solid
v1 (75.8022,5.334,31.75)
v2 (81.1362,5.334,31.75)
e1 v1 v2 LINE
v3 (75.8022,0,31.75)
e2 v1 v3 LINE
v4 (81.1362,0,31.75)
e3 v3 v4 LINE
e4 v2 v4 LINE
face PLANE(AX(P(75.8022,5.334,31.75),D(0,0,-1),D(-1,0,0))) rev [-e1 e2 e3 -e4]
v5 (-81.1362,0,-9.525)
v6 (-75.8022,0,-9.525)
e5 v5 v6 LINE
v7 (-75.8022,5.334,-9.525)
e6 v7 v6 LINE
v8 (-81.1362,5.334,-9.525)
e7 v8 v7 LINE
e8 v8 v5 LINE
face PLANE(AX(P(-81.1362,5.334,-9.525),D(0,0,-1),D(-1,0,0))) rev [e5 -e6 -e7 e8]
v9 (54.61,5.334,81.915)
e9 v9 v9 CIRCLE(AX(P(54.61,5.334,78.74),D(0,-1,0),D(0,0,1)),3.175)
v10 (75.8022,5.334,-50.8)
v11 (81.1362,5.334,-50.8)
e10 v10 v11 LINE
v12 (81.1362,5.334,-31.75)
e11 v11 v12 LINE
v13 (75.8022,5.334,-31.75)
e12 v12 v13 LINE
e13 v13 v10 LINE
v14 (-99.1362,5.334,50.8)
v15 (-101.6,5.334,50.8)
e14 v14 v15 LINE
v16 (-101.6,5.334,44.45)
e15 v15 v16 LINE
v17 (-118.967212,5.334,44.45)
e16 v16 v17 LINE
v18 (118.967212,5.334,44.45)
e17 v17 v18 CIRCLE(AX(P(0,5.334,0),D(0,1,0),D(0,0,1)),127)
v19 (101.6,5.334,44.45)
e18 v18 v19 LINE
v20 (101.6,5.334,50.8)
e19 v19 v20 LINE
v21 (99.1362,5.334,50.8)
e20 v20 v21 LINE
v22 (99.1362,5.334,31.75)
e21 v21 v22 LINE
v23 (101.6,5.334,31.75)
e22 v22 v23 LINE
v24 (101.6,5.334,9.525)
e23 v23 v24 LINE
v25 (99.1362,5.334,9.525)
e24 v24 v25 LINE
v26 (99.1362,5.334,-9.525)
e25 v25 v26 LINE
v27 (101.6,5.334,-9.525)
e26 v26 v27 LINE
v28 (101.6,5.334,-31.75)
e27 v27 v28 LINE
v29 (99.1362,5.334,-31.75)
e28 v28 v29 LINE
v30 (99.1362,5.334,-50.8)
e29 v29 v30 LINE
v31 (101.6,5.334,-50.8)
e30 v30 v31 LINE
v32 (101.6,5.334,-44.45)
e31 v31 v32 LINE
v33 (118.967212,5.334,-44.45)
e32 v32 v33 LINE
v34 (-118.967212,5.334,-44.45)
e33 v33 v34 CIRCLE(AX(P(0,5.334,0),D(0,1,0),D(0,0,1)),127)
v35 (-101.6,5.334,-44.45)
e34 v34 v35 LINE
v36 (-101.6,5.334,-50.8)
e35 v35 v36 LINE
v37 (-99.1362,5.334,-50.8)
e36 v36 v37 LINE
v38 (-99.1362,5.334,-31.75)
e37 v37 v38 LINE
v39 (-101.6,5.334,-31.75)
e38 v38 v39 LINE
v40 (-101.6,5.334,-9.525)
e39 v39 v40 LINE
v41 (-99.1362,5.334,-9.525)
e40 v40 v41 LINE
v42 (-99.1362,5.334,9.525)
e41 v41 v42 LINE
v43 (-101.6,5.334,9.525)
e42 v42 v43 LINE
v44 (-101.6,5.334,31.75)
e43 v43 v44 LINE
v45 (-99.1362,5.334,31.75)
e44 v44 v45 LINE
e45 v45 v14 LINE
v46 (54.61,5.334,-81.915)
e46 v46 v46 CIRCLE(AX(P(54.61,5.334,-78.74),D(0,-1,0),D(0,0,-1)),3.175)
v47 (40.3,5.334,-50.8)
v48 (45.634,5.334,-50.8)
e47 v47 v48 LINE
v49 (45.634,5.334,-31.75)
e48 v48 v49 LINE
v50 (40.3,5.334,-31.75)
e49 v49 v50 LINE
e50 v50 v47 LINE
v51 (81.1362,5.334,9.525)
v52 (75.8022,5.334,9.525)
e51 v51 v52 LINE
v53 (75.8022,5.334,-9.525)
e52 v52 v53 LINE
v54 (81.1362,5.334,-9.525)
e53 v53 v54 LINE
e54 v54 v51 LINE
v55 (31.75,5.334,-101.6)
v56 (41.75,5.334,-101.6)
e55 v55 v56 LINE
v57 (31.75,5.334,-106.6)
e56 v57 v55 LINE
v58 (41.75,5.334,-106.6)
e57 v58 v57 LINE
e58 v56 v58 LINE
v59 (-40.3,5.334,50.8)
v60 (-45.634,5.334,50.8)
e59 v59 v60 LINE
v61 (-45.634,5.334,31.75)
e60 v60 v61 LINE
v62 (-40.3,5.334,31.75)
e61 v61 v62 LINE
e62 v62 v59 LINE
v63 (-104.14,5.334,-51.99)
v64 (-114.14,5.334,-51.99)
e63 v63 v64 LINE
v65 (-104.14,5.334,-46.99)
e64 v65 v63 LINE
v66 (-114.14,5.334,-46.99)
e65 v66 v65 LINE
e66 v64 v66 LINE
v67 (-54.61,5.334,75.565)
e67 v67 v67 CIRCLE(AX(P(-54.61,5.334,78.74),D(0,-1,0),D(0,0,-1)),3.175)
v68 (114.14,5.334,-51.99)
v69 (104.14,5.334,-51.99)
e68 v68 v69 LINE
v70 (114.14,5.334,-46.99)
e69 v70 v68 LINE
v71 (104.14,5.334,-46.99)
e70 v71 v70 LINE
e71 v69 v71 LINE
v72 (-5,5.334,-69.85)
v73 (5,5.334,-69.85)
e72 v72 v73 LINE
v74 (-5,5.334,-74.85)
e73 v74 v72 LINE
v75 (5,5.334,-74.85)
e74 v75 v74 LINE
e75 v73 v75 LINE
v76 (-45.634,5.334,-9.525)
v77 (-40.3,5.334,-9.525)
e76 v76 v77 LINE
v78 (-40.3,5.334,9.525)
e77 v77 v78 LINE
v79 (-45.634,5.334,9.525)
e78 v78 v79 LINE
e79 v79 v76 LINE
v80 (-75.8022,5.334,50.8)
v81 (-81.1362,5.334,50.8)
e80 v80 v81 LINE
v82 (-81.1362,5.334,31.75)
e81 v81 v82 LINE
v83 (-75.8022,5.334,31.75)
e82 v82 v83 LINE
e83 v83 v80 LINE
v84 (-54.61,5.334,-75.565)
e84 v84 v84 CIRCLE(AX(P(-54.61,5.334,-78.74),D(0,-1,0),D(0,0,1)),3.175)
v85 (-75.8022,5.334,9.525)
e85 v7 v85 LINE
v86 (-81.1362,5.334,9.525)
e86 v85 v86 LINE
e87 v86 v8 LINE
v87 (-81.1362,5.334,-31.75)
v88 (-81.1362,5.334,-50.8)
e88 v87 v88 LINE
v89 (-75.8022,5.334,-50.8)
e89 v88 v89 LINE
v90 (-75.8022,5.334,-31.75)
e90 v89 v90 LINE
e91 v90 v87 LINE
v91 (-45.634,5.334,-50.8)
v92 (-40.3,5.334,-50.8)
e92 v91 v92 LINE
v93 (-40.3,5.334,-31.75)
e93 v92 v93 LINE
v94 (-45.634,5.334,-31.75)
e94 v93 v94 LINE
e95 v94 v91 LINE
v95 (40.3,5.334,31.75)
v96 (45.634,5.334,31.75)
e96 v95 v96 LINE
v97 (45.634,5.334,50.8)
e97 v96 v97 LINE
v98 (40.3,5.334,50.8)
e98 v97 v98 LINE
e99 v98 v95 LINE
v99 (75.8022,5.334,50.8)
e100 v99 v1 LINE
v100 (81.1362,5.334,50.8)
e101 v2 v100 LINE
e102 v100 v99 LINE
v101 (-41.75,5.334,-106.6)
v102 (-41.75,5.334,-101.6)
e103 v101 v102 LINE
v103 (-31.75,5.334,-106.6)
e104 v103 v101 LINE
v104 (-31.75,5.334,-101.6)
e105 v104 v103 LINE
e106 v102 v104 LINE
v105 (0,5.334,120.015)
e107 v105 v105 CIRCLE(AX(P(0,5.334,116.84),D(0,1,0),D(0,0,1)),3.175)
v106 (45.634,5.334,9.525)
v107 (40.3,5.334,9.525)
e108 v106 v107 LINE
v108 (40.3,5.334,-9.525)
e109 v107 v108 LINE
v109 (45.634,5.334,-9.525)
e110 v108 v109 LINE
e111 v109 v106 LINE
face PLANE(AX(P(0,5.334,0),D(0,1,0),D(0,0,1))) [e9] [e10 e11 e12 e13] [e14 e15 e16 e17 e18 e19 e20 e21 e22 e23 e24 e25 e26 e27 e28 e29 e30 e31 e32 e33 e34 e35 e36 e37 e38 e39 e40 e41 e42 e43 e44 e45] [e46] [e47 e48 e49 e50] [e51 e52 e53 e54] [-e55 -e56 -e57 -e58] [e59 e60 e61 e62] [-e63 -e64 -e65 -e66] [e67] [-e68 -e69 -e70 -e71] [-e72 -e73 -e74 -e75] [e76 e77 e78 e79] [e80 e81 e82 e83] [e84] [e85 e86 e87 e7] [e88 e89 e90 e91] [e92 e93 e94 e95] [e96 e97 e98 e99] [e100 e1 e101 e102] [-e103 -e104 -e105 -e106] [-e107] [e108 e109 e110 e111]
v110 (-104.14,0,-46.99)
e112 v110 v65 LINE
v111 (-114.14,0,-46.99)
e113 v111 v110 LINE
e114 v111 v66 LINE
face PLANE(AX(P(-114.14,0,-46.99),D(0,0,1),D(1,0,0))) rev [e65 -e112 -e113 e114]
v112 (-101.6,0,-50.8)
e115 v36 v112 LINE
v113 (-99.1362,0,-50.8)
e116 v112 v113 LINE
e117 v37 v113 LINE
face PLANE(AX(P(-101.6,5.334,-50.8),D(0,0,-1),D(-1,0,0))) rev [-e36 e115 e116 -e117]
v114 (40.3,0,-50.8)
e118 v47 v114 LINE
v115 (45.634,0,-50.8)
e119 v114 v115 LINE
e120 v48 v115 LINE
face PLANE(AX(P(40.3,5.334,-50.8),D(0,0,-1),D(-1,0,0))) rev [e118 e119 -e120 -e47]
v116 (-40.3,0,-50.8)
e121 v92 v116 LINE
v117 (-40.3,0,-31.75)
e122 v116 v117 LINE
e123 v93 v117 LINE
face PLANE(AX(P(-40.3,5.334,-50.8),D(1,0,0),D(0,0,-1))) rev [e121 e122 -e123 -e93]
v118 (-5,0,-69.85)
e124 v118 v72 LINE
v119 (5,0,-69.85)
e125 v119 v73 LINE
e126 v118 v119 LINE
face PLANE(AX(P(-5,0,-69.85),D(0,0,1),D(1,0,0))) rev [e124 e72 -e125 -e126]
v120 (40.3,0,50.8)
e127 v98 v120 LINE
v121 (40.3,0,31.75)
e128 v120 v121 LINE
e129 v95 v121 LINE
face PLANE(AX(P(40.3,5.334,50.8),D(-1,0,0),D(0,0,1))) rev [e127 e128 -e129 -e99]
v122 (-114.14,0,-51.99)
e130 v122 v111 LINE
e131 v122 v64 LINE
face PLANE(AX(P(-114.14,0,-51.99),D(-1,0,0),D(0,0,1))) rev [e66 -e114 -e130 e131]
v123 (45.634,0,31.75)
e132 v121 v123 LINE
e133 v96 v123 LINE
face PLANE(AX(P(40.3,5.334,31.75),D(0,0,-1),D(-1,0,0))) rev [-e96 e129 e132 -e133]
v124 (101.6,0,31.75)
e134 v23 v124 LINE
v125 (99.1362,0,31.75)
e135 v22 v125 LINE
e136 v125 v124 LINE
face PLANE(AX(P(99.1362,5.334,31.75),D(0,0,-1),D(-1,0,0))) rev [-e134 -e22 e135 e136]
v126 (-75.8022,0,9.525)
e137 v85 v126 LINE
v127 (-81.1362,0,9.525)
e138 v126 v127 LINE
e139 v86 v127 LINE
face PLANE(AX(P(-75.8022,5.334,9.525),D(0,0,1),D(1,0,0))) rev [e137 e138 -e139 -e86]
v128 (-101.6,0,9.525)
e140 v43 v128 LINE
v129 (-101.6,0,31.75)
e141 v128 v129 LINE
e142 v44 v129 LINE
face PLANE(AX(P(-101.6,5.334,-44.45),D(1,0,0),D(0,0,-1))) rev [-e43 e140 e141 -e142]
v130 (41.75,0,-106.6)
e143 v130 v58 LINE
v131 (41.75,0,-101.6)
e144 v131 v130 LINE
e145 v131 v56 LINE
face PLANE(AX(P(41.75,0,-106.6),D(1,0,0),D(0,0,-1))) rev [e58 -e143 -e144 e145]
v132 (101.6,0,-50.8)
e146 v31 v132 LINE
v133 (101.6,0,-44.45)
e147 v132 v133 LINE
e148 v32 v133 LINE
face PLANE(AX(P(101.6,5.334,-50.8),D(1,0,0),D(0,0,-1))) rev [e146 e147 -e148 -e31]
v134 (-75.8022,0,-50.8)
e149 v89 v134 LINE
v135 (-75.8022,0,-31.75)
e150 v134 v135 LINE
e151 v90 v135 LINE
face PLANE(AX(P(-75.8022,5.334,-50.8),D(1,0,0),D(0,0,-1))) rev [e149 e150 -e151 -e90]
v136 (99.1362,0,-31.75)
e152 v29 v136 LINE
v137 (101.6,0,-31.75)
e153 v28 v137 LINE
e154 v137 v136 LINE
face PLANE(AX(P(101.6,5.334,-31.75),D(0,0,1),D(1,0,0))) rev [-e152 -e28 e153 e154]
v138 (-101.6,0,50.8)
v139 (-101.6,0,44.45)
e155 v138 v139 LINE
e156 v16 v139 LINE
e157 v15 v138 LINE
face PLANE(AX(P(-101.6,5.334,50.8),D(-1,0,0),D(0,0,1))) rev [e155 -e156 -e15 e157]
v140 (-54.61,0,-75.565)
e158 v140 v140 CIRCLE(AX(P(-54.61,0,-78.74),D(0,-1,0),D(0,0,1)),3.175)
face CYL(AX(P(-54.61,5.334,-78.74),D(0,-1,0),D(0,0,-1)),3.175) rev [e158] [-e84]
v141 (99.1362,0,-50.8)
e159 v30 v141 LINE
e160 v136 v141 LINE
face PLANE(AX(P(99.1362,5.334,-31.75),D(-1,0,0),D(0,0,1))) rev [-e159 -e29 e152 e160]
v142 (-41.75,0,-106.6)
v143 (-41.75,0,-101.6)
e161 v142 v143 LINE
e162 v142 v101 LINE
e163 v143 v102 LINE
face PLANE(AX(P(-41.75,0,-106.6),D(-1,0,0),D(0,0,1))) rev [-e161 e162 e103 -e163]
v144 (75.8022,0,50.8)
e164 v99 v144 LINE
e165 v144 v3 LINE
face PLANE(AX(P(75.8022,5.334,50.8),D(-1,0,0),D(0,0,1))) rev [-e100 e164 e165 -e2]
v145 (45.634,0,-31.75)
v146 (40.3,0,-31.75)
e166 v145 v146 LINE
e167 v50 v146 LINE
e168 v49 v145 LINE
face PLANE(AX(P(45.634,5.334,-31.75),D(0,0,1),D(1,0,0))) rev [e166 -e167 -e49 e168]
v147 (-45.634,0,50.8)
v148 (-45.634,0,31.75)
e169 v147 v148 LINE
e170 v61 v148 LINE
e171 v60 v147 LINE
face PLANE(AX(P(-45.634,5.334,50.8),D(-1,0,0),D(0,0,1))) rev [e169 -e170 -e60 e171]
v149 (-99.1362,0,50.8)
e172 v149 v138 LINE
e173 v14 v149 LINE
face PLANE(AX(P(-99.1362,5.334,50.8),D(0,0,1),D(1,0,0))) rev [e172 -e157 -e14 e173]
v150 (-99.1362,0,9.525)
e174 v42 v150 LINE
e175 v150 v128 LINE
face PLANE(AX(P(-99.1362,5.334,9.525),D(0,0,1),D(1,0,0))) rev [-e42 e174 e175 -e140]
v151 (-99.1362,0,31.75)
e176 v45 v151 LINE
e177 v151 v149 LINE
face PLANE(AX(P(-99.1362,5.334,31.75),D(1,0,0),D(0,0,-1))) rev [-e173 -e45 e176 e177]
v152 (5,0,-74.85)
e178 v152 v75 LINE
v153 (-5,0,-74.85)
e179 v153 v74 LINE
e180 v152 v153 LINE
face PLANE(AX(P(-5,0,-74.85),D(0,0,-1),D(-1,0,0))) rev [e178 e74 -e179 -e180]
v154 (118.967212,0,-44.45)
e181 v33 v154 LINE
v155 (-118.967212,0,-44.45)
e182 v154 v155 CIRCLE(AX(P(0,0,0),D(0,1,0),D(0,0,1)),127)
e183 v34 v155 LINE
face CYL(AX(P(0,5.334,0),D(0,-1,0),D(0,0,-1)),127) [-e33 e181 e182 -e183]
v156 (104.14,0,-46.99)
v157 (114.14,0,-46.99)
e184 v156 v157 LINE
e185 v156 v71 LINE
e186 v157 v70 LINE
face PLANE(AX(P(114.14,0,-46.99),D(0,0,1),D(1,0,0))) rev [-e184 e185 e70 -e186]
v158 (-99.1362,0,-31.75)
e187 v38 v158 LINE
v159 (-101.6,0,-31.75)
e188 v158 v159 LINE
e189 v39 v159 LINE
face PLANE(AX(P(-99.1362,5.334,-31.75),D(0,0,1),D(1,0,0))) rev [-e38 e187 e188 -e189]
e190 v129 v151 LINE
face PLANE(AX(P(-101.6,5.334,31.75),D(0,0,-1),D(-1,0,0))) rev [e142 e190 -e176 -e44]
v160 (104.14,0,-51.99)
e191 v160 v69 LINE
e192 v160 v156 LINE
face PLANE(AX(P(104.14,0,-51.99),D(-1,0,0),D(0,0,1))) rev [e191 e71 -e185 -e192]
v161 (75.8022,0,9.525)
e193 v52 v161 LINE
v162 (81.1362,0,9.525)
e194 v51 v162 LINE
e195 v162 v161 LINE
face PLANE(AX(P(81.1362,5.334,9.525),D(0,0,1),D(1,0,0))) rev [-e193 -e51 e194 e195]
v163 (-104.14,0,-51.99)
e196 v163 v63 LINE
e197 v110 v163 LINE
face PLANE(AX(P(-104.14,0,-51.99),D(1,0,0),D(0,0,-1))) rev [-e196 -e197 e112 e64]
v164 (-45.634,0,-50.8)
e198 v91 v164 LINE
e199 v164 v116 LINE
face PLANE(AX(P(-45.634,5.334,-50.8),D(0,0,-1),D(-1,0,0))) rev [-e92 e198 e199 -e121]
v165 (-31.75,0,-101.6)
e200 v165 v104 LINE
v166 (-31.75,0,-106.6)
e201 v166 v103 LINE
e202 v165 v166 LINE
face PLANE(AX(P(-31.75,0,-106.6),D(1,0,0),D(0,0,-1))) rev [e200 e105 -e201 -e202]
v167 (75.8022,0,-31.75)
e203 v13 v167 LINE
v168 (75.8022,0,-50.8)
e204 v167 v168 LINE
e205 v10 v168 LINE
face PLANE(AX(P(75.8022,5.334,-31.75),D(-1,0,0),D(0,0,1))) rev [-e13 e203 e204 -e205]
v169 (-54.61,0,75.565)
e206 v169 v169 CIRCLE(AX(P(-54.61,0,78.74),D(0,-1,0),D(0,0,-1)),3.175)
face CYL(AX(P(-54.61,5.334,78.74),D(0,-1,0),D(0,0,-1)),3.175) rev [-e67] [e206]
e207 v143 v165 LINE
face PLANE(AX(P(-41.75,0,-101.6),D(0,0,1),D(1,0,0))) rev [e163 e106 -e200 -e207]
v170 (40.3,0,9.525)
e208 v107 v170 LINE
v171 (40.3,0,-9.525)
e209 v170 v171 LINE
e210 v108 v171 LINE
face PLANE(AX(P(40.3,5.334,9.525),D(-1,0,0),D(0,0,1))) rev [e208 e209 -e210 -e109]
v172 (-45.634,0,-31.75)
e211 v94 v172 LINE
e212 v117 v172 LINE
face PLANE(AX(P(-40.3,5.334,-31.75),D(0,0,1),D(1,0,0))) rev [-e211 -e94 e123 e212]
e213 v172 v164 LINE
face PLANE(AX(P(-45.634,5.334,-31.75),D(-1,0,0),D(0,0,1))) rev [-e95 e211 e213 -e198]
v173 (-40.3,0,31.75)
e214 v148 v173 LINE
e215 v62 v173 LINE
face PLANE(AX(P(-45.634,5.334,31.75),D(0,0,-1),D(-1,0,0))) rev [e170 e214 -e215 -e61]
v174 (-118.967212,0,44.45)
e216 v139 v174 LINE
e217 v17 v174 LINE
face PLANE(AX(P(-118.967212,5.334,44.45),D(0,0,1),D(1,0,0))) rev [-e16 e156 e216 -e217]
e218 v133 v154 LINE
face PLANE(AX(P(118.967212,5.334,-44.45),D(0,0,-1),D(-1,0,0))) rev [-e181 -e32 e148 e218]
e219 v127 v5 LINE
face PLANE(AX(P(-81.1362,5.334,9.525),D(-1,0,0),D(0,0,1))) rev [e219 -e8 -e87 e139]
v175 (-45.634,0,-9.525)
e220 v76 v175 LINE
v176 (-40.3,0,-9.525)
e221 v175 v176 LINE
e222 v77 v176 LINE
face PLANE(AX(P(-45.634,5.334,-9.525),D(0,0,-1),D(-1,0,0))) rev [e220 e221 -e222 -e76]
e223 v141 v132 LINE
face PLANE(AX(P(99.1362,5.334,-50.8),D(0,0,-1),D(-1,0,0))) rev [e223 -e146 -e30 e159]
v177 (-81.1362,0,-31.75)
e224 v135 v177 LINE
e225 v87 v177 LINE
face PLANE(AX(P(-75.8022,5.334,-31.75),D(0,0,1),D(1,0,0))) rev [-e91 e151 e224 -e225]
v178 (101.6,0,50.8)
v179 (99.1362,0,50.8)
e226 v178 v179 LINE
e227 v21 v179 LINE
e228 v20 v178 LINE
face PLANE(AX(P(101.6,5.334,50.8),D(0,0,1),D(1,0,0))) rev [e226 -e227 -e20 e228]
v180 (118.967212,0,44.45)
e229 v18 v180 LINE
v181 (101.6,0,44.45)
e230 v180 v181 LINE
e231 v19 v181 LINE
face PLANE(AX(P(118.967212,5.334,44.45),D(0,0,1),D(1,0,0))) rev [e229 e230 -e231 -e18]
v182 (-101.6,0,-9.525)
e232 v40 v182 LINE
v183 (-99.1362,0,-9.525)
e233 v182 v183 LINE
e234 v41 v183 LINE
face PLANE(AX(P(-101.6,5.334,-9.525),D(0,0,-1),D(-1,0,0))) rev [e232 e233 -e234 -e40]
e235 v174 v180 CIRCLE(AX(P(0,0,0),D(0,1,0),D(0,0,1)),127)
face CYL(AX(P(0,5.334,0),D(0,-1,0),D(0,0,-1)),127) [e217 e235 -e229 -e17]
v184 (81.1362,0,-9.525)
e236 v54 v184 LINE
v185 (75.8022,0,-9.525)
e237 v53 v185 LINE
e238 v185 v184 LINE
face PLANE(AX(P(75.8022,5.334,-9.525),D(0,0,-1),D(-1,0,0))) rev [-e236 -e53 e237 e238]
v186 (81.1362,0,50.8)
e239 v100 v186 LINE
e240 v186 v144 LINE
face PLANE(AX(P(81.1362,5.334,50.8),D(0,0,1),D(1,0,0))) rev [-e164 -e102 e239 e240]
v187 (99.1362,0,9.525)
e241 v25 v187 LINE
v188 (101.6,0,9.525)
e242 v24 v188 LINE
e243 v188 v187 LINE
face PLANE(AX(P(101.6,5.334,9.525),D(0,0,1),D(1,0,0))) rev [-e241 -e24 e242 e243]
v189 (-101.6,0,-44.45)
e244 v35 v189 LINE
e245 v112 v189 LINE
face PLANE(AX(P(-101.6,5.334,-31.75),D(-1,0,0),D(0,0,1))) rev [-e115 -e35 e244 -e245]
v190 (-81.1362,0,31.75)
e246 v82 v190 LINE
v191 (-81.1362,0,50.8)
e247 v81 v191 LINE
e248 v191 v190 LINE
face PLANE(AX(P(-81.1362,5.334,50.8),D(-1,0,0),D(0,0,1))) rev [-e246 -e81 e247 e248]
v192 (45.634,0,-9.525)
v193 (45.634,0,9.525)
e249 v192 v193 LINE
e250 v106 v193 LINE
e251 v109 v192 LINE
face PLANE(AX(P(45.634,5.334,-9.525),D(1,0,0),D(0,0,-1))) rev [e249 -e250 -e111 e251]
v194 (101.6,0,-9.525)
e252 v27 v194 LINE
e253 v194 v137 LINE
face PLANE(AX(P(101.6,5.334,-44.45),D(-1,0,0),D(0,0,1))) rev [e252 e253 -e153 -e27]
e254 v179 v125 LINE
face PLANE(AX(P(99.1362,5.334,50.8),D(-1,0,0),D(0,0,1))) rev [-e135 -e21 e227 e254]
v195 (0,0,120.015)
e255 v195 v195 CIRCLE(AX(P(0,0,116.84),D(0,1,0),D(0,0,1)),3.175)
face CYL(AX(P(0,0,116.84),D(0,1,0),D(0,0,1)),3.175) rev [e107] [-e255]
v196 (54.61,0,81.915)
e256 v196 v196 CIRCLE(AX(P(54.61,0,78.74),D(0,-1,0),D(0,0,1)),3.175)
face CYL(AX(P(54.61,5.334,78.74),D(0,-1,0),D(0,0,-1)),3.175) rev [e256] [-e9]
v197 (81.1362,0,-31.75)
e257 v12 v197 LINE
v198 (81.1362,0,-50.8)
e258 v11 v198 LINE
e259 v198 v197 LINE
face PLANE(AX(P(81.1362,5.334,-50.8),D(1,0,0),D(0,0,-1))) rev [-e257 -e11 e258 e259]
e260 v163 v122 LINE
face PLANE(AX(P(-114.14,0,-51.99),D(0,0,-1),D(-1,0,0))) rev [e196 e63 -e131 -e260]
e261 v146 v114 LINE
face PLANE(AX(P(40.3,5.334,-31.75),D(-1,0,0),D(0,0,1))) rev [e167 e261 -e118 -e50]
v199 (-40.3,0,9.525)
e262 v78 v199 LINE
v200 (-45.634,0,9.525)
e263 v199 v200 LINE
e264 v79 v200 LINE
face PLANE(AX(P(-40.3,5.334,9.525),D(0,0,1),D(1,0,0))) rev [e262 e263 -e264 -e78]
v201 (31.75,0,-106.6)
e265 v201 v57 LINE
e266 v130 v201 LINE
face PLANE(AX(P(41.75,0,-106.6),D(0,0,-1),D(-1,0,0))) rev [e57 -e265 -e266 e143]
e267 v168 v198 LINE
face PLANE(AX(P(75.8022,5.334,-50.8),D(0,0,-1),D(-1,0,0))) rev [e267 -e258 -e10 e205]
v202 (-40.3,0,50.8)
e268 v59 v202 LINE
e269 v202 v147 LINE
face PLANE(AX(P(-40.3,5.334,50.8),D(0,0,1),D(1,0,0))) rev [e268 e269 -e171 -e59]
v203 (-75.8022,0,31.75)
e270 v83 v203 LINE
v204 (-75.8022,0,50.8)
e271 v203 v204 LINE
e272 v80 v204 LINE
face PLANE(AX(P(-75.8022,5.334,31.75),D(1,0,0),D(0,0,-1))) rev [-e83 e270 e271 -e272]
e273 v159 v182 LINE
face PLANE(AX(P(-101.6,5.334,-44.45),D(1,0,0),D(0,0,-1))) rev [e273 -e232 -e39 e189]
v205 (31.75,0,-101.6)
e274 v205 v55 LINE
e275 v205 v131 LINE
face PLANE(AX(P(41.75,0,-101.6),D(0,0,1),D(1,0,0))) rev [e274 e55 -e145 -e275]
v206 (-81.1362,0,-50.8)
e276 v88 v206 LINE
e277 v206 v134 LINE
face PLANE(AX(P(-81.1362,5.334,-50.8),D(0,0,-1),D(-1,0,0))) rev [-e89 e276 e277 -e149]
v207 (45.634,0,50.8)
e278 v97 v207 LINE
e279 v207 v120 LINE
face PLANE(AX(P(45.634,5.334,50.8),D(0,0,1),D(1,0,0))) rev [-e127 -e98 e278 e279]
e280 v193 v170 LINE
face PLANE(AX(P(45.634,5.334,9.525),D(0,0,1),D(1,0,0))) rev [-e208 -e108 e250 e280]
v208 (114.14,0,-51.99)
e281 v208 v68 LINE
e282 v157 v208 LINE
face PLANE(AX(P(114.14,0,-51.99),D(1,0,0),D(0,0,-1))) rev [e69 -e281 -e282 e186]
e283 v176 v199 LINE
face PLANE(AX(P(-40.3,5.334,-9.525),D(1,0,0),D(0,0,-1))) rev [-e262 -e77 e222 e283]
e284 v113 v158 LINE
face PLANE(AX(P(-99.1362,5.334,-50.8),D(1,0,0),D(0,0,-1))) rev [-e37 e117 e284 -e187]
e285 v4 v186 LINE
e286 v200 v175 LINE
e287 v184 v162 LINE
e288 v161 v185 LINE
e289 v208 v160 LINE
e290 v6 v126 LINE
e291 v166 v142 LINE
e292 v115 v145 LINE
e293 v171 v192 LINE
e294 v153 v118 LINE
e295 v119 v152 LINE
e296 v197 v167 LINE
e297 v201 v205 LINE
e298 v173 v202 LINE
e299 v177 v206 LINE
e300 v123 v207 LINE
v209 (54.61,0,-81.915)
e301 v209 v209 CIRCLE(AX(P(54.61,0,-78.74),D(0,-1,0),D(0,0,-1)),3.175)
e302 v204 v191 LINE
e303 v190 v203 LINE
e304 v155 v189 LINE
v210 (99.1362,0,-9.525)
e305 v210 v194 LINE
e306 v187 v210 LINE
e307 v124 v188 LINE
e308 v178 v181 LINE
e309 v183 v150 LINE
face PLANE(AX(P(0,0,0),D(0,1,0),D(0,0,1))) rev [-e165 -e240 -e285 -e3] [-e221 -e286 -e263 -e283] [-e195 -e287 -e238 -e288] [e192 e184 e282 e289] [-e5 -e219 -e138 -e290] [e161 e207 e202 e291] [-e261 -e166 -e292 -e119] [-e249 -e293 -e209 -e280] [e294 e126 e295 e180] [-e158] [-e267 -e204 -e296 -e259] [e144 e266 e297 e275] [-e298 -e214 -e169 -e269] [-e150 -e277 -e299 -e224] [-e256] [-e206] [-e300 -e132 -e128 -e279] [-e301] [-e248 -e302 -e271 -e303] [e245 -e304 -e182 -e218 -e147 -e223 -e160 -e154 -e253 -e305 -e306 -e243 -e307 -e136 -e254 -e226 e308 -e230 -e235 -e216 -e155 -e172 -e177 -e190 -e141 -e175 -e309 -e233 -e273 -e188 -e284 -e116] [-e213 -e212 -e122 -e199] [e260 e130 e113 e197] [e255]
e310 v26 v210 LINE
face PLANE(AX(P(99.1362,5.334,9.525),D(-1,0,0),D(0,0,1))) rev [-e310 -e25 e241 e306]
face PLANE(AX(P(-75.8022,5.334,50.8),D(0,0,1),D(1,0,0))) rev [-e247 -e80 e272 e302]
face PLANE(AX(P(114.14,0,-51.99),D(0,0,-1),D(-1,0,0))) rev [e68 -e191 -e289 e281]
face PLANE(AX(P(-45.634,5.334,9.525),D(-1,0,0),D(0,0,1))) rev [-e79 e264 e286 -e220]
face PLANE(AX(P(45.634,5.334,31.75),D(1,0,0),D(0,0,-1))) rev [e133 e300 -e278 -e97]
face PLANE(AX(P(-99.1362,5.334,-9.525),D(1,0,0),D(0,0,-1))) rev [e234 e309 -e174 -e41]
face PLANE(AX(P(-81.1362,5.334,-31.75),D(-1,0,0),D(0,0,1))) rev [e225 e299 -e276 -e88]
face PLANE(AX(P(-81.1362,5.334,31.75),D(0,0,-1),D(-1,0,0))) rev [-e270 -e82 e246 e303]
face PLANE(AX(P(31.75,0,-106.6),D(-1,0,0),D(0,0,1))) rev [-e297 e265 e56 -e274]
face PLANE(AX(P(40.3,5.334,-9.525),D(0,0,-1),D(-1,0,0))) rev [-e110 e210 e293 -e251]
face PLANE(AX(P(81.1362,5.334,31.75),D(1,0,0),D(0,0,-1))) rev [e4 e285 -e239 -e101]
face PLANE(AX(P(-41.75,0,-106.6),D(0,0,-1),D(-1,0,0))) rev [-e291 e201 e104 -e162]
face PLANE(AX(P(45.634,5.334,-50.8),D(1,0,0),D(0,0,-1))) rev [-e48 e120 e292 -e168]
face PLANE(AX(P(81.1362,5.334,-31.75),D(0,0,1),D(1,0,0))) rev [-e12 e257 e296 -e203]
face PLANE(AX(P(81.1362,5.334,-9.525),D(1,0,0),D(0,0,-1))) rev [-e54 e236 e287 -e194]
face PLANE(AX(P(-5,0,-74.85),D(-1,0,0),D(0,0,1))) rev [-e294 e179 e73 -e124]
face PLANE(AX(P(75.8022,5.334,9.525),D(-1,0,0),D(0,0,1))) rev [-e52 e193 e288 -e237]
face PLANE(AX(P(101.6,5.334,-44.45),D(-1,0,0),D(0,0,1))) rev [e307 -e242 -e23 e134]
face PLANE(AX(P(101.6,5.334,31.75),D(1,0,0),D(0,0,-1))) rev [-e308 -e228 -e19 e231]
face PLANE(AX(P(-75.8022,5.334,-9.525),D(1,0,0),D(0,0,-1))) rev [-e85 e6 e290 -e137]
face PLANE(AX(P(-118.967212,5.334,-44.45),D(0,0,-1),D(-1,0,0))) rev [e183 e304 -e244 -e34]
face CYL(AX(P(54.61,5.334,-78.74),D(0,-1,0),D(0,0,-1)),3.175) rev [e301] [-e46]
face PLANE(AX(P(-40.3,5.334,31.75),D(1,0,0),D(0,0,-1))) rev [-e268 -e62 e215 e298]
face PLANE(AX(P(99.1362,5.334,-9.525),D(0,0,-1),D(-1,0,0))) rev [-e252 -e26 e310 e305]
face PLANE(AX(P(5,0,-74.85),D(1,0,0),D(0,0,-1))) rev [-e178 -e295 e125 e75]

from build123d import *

# Parameters (mm, degrees)
BASE_DEPTH                = 5.334
SKETCH9_W                 = 10
SKETCH9_H                 = 5
TAPE_SENSOR_CUTOUTS_DEPTH = 175.099537782
SKETCH6_W                 = 5.334
SKETCH6_H                 = 19.05
SKETCH6_W_2               = 2.4638
RIGHT_MOUNT_SLOTS_DEPTH   = 175.099537782
SKETCH7_W                 = 5.334
SKETCH7_H                 = 19.05
SKETCH7_W_2               = 2.4638
LEFT_MOUNT_SLOTS_DEPTH    = 175.099537782
SKETCH8_R                 = 3.175
CASTER_SCREWS_DEPTH       = 175.099537782
HOLE1_OUTLINE_R           = 3.175
HOLE1_DEPTH               = 5.334


# Read off the part's stored shape, not the designer's step: Hole1
with BuildPart() as part:
    # Sketch1 → Base (new body)
    with BuildSketch(Plane(origin=(0, 0, 0), x_dir=(1, 0, 0), z_dir=(0, 1, 0))):
        with BuildLine():
            Line((118.967211869, -44.45), (101.6, -44.45))
            Line((101.6, -44.45), (101.6, 44.45))
            Line((101.6, 44.45), (118.967211869, 44.45))
            ThreePointArc((118.967211869, 44.45), (0, 127), (-118.967211869, 44.45))
            Line((-118.967211869, 44.45), (-101.6, 44.45))
            Line((-101.6, 44.45), (-101.6, -44.45))
            Line((-101.6, -44.45), (-118.967211869, -44.45))
            ThreePointArc((-118.967211869, -44.45), (0, -127), (118.967211869, -44.45))
        make_face()
    extrude(amount=BASE_DEPTH)

    # Sketch9 → Tape Sensor Cutouts (cut, through all)
    with BuildSketch(Plane(origin=(0, 5.334, 0), x_dir=(1, 0, 0), z_dir=(0, 1, 0))):
        with Locations((-36.75, 104.1)):
            Rectangle(SKETCH9_W, SKETCH9_H)
        with Locations((36.75, 104.1)):
            Rectangle(SKETCH9_W, SKETCH9_H)
        with Locations((0, 72.35)):
            Rectangle(SKETCH9_W, SKETCH9_H)
        with Locations((-109.14, 49.49)):
            Rectangle(SKETCH9_W, SKETCH9_H)
        with Locations((109.14, 49.49)):
            Rectangle(SKETCH9_W, SKETCH9_H)
    extrude(amount=-TAPE_SENSOR_CUTOUTS_DEPTH, mode=Mode.SUBTRACT)

    # Sketch6 → Right Mount Slots (cut, through all)
    with BuildSketch(Plane.XZ):
        with Locations((42.967, 41.275)):
            Rectangle(SKETCH6_W, SKETCH6_H)
        with Locations((42.967, 0)):
            Rectangle(SKETCH6_W, SKETCH6_H)
        with Locations((42.967, -41.275)):
            Rectangle(SKETCH6_W, SKETCH6_H)
        with Locations((100.3681, 41.275)):
            Rectangle(SKETCH6_W_2, SKETCH6_H)
        with Locations((100.3681, 0)):
            Rectangle(SKETCH6_W_2, SKETCH6_H)
        with Locations((100.3681, -41.275)):
            Rectangle(SKETCH6_W_2, SKETCH6_H)
        with Locations((78.4692, 41.275)):
            Rectangle(SKETCH6_W, SKETCH6_H)
        with Locations((78.4692, 0)):
            Rectangle(SKETCH6_W, SKETCH6_H)
        with Locations((78.4692, -41.275)):
            Rectangle(SKETCH6_W, SKETCH6_H)
    extrude(amount=-RIGHT_MOUNT_SLOTS_DEPTH, mode=Mode.SUBTRACT)

    # Sketch7 → Left Mount Slots (cut, through all)
    with BuildSketch(Plane.XZ):
        with Locations((-78.4692, 0)):
            Rectangle(SKETCH7_W, SKETCH7_H)
        with Locations((-78.4692, 41.275)):
            Rectangle(SKETCH7_W, SKETCH7_H)
        with Locations((-78.4692, -41.275)):
            Rectangle(SKETCH7_W, SKETCH7_H)
        with Locations((-42.967, 41.275)):
            Rectangle(SKETCH7_W, SKETCH7_H)
        with Locations((-42.967, 0)):
            Rectangle(SKETCH7_W, SKETCH7_H)
        with Locations((-42.967, -41.275)):
            Rectangle(SKETCH7_W, SKETCH7_H)
        with Locations((-100.3681, 41.275)):
            Rectangle(SKETCH7_W_2, SKETCH7_H)
        with Locations((-100.3681, 0)):
            Rectangle(SKETCH7_W_2, SKETCH7_H)
        with Locations((-100.3681, -41.275)):
            Rectangle(SKETCH7_W_2, SKETCH7_H)
    extrude(amount=-LEFT_MOUNT_SLOTS_DEPTH, mode=Mode.SUBTRACT)

    # Sketch8 → Caster Screws (cut, through all)
    with BuildSketch(Plane(origin=(0, 5.334, 0), x_dir=(1, 0, 0), z_dir=(0, 1, 0))):
        with Locations(Location((0, -116.84, 0), (0, 0, 270))):
            Circle(SKETCH8_R)
    extrude(amount=-CASTER_SCREWS_DEPTH, mode=Mode.SUBTRACT)

    # Hole1 outline → Hole1 (cut)
    with BuildSketch(Plane(origin=(0, 0, 0), x_dir=(1, 0, 0), z_dir=(0, 1, 0))):
        with Locations((-54.61, -78.74)):
            Circle(HOLE1_OUTLINE_R)
        with Locations((54.61, -78.74)):
            Circle(HOLE1_OUTLINE_R)
        with Locations((54.61, 78.74)):
            Circle(HOLE1_OUTLINE_R)
        with Locations((-54.61, 78.74)):
            Circle(HOLE1_OUTLINE_R)
    extrude(amount=HOLE1_DEPTH, mode=Mode.SUBTRACT)


solid = part.part
